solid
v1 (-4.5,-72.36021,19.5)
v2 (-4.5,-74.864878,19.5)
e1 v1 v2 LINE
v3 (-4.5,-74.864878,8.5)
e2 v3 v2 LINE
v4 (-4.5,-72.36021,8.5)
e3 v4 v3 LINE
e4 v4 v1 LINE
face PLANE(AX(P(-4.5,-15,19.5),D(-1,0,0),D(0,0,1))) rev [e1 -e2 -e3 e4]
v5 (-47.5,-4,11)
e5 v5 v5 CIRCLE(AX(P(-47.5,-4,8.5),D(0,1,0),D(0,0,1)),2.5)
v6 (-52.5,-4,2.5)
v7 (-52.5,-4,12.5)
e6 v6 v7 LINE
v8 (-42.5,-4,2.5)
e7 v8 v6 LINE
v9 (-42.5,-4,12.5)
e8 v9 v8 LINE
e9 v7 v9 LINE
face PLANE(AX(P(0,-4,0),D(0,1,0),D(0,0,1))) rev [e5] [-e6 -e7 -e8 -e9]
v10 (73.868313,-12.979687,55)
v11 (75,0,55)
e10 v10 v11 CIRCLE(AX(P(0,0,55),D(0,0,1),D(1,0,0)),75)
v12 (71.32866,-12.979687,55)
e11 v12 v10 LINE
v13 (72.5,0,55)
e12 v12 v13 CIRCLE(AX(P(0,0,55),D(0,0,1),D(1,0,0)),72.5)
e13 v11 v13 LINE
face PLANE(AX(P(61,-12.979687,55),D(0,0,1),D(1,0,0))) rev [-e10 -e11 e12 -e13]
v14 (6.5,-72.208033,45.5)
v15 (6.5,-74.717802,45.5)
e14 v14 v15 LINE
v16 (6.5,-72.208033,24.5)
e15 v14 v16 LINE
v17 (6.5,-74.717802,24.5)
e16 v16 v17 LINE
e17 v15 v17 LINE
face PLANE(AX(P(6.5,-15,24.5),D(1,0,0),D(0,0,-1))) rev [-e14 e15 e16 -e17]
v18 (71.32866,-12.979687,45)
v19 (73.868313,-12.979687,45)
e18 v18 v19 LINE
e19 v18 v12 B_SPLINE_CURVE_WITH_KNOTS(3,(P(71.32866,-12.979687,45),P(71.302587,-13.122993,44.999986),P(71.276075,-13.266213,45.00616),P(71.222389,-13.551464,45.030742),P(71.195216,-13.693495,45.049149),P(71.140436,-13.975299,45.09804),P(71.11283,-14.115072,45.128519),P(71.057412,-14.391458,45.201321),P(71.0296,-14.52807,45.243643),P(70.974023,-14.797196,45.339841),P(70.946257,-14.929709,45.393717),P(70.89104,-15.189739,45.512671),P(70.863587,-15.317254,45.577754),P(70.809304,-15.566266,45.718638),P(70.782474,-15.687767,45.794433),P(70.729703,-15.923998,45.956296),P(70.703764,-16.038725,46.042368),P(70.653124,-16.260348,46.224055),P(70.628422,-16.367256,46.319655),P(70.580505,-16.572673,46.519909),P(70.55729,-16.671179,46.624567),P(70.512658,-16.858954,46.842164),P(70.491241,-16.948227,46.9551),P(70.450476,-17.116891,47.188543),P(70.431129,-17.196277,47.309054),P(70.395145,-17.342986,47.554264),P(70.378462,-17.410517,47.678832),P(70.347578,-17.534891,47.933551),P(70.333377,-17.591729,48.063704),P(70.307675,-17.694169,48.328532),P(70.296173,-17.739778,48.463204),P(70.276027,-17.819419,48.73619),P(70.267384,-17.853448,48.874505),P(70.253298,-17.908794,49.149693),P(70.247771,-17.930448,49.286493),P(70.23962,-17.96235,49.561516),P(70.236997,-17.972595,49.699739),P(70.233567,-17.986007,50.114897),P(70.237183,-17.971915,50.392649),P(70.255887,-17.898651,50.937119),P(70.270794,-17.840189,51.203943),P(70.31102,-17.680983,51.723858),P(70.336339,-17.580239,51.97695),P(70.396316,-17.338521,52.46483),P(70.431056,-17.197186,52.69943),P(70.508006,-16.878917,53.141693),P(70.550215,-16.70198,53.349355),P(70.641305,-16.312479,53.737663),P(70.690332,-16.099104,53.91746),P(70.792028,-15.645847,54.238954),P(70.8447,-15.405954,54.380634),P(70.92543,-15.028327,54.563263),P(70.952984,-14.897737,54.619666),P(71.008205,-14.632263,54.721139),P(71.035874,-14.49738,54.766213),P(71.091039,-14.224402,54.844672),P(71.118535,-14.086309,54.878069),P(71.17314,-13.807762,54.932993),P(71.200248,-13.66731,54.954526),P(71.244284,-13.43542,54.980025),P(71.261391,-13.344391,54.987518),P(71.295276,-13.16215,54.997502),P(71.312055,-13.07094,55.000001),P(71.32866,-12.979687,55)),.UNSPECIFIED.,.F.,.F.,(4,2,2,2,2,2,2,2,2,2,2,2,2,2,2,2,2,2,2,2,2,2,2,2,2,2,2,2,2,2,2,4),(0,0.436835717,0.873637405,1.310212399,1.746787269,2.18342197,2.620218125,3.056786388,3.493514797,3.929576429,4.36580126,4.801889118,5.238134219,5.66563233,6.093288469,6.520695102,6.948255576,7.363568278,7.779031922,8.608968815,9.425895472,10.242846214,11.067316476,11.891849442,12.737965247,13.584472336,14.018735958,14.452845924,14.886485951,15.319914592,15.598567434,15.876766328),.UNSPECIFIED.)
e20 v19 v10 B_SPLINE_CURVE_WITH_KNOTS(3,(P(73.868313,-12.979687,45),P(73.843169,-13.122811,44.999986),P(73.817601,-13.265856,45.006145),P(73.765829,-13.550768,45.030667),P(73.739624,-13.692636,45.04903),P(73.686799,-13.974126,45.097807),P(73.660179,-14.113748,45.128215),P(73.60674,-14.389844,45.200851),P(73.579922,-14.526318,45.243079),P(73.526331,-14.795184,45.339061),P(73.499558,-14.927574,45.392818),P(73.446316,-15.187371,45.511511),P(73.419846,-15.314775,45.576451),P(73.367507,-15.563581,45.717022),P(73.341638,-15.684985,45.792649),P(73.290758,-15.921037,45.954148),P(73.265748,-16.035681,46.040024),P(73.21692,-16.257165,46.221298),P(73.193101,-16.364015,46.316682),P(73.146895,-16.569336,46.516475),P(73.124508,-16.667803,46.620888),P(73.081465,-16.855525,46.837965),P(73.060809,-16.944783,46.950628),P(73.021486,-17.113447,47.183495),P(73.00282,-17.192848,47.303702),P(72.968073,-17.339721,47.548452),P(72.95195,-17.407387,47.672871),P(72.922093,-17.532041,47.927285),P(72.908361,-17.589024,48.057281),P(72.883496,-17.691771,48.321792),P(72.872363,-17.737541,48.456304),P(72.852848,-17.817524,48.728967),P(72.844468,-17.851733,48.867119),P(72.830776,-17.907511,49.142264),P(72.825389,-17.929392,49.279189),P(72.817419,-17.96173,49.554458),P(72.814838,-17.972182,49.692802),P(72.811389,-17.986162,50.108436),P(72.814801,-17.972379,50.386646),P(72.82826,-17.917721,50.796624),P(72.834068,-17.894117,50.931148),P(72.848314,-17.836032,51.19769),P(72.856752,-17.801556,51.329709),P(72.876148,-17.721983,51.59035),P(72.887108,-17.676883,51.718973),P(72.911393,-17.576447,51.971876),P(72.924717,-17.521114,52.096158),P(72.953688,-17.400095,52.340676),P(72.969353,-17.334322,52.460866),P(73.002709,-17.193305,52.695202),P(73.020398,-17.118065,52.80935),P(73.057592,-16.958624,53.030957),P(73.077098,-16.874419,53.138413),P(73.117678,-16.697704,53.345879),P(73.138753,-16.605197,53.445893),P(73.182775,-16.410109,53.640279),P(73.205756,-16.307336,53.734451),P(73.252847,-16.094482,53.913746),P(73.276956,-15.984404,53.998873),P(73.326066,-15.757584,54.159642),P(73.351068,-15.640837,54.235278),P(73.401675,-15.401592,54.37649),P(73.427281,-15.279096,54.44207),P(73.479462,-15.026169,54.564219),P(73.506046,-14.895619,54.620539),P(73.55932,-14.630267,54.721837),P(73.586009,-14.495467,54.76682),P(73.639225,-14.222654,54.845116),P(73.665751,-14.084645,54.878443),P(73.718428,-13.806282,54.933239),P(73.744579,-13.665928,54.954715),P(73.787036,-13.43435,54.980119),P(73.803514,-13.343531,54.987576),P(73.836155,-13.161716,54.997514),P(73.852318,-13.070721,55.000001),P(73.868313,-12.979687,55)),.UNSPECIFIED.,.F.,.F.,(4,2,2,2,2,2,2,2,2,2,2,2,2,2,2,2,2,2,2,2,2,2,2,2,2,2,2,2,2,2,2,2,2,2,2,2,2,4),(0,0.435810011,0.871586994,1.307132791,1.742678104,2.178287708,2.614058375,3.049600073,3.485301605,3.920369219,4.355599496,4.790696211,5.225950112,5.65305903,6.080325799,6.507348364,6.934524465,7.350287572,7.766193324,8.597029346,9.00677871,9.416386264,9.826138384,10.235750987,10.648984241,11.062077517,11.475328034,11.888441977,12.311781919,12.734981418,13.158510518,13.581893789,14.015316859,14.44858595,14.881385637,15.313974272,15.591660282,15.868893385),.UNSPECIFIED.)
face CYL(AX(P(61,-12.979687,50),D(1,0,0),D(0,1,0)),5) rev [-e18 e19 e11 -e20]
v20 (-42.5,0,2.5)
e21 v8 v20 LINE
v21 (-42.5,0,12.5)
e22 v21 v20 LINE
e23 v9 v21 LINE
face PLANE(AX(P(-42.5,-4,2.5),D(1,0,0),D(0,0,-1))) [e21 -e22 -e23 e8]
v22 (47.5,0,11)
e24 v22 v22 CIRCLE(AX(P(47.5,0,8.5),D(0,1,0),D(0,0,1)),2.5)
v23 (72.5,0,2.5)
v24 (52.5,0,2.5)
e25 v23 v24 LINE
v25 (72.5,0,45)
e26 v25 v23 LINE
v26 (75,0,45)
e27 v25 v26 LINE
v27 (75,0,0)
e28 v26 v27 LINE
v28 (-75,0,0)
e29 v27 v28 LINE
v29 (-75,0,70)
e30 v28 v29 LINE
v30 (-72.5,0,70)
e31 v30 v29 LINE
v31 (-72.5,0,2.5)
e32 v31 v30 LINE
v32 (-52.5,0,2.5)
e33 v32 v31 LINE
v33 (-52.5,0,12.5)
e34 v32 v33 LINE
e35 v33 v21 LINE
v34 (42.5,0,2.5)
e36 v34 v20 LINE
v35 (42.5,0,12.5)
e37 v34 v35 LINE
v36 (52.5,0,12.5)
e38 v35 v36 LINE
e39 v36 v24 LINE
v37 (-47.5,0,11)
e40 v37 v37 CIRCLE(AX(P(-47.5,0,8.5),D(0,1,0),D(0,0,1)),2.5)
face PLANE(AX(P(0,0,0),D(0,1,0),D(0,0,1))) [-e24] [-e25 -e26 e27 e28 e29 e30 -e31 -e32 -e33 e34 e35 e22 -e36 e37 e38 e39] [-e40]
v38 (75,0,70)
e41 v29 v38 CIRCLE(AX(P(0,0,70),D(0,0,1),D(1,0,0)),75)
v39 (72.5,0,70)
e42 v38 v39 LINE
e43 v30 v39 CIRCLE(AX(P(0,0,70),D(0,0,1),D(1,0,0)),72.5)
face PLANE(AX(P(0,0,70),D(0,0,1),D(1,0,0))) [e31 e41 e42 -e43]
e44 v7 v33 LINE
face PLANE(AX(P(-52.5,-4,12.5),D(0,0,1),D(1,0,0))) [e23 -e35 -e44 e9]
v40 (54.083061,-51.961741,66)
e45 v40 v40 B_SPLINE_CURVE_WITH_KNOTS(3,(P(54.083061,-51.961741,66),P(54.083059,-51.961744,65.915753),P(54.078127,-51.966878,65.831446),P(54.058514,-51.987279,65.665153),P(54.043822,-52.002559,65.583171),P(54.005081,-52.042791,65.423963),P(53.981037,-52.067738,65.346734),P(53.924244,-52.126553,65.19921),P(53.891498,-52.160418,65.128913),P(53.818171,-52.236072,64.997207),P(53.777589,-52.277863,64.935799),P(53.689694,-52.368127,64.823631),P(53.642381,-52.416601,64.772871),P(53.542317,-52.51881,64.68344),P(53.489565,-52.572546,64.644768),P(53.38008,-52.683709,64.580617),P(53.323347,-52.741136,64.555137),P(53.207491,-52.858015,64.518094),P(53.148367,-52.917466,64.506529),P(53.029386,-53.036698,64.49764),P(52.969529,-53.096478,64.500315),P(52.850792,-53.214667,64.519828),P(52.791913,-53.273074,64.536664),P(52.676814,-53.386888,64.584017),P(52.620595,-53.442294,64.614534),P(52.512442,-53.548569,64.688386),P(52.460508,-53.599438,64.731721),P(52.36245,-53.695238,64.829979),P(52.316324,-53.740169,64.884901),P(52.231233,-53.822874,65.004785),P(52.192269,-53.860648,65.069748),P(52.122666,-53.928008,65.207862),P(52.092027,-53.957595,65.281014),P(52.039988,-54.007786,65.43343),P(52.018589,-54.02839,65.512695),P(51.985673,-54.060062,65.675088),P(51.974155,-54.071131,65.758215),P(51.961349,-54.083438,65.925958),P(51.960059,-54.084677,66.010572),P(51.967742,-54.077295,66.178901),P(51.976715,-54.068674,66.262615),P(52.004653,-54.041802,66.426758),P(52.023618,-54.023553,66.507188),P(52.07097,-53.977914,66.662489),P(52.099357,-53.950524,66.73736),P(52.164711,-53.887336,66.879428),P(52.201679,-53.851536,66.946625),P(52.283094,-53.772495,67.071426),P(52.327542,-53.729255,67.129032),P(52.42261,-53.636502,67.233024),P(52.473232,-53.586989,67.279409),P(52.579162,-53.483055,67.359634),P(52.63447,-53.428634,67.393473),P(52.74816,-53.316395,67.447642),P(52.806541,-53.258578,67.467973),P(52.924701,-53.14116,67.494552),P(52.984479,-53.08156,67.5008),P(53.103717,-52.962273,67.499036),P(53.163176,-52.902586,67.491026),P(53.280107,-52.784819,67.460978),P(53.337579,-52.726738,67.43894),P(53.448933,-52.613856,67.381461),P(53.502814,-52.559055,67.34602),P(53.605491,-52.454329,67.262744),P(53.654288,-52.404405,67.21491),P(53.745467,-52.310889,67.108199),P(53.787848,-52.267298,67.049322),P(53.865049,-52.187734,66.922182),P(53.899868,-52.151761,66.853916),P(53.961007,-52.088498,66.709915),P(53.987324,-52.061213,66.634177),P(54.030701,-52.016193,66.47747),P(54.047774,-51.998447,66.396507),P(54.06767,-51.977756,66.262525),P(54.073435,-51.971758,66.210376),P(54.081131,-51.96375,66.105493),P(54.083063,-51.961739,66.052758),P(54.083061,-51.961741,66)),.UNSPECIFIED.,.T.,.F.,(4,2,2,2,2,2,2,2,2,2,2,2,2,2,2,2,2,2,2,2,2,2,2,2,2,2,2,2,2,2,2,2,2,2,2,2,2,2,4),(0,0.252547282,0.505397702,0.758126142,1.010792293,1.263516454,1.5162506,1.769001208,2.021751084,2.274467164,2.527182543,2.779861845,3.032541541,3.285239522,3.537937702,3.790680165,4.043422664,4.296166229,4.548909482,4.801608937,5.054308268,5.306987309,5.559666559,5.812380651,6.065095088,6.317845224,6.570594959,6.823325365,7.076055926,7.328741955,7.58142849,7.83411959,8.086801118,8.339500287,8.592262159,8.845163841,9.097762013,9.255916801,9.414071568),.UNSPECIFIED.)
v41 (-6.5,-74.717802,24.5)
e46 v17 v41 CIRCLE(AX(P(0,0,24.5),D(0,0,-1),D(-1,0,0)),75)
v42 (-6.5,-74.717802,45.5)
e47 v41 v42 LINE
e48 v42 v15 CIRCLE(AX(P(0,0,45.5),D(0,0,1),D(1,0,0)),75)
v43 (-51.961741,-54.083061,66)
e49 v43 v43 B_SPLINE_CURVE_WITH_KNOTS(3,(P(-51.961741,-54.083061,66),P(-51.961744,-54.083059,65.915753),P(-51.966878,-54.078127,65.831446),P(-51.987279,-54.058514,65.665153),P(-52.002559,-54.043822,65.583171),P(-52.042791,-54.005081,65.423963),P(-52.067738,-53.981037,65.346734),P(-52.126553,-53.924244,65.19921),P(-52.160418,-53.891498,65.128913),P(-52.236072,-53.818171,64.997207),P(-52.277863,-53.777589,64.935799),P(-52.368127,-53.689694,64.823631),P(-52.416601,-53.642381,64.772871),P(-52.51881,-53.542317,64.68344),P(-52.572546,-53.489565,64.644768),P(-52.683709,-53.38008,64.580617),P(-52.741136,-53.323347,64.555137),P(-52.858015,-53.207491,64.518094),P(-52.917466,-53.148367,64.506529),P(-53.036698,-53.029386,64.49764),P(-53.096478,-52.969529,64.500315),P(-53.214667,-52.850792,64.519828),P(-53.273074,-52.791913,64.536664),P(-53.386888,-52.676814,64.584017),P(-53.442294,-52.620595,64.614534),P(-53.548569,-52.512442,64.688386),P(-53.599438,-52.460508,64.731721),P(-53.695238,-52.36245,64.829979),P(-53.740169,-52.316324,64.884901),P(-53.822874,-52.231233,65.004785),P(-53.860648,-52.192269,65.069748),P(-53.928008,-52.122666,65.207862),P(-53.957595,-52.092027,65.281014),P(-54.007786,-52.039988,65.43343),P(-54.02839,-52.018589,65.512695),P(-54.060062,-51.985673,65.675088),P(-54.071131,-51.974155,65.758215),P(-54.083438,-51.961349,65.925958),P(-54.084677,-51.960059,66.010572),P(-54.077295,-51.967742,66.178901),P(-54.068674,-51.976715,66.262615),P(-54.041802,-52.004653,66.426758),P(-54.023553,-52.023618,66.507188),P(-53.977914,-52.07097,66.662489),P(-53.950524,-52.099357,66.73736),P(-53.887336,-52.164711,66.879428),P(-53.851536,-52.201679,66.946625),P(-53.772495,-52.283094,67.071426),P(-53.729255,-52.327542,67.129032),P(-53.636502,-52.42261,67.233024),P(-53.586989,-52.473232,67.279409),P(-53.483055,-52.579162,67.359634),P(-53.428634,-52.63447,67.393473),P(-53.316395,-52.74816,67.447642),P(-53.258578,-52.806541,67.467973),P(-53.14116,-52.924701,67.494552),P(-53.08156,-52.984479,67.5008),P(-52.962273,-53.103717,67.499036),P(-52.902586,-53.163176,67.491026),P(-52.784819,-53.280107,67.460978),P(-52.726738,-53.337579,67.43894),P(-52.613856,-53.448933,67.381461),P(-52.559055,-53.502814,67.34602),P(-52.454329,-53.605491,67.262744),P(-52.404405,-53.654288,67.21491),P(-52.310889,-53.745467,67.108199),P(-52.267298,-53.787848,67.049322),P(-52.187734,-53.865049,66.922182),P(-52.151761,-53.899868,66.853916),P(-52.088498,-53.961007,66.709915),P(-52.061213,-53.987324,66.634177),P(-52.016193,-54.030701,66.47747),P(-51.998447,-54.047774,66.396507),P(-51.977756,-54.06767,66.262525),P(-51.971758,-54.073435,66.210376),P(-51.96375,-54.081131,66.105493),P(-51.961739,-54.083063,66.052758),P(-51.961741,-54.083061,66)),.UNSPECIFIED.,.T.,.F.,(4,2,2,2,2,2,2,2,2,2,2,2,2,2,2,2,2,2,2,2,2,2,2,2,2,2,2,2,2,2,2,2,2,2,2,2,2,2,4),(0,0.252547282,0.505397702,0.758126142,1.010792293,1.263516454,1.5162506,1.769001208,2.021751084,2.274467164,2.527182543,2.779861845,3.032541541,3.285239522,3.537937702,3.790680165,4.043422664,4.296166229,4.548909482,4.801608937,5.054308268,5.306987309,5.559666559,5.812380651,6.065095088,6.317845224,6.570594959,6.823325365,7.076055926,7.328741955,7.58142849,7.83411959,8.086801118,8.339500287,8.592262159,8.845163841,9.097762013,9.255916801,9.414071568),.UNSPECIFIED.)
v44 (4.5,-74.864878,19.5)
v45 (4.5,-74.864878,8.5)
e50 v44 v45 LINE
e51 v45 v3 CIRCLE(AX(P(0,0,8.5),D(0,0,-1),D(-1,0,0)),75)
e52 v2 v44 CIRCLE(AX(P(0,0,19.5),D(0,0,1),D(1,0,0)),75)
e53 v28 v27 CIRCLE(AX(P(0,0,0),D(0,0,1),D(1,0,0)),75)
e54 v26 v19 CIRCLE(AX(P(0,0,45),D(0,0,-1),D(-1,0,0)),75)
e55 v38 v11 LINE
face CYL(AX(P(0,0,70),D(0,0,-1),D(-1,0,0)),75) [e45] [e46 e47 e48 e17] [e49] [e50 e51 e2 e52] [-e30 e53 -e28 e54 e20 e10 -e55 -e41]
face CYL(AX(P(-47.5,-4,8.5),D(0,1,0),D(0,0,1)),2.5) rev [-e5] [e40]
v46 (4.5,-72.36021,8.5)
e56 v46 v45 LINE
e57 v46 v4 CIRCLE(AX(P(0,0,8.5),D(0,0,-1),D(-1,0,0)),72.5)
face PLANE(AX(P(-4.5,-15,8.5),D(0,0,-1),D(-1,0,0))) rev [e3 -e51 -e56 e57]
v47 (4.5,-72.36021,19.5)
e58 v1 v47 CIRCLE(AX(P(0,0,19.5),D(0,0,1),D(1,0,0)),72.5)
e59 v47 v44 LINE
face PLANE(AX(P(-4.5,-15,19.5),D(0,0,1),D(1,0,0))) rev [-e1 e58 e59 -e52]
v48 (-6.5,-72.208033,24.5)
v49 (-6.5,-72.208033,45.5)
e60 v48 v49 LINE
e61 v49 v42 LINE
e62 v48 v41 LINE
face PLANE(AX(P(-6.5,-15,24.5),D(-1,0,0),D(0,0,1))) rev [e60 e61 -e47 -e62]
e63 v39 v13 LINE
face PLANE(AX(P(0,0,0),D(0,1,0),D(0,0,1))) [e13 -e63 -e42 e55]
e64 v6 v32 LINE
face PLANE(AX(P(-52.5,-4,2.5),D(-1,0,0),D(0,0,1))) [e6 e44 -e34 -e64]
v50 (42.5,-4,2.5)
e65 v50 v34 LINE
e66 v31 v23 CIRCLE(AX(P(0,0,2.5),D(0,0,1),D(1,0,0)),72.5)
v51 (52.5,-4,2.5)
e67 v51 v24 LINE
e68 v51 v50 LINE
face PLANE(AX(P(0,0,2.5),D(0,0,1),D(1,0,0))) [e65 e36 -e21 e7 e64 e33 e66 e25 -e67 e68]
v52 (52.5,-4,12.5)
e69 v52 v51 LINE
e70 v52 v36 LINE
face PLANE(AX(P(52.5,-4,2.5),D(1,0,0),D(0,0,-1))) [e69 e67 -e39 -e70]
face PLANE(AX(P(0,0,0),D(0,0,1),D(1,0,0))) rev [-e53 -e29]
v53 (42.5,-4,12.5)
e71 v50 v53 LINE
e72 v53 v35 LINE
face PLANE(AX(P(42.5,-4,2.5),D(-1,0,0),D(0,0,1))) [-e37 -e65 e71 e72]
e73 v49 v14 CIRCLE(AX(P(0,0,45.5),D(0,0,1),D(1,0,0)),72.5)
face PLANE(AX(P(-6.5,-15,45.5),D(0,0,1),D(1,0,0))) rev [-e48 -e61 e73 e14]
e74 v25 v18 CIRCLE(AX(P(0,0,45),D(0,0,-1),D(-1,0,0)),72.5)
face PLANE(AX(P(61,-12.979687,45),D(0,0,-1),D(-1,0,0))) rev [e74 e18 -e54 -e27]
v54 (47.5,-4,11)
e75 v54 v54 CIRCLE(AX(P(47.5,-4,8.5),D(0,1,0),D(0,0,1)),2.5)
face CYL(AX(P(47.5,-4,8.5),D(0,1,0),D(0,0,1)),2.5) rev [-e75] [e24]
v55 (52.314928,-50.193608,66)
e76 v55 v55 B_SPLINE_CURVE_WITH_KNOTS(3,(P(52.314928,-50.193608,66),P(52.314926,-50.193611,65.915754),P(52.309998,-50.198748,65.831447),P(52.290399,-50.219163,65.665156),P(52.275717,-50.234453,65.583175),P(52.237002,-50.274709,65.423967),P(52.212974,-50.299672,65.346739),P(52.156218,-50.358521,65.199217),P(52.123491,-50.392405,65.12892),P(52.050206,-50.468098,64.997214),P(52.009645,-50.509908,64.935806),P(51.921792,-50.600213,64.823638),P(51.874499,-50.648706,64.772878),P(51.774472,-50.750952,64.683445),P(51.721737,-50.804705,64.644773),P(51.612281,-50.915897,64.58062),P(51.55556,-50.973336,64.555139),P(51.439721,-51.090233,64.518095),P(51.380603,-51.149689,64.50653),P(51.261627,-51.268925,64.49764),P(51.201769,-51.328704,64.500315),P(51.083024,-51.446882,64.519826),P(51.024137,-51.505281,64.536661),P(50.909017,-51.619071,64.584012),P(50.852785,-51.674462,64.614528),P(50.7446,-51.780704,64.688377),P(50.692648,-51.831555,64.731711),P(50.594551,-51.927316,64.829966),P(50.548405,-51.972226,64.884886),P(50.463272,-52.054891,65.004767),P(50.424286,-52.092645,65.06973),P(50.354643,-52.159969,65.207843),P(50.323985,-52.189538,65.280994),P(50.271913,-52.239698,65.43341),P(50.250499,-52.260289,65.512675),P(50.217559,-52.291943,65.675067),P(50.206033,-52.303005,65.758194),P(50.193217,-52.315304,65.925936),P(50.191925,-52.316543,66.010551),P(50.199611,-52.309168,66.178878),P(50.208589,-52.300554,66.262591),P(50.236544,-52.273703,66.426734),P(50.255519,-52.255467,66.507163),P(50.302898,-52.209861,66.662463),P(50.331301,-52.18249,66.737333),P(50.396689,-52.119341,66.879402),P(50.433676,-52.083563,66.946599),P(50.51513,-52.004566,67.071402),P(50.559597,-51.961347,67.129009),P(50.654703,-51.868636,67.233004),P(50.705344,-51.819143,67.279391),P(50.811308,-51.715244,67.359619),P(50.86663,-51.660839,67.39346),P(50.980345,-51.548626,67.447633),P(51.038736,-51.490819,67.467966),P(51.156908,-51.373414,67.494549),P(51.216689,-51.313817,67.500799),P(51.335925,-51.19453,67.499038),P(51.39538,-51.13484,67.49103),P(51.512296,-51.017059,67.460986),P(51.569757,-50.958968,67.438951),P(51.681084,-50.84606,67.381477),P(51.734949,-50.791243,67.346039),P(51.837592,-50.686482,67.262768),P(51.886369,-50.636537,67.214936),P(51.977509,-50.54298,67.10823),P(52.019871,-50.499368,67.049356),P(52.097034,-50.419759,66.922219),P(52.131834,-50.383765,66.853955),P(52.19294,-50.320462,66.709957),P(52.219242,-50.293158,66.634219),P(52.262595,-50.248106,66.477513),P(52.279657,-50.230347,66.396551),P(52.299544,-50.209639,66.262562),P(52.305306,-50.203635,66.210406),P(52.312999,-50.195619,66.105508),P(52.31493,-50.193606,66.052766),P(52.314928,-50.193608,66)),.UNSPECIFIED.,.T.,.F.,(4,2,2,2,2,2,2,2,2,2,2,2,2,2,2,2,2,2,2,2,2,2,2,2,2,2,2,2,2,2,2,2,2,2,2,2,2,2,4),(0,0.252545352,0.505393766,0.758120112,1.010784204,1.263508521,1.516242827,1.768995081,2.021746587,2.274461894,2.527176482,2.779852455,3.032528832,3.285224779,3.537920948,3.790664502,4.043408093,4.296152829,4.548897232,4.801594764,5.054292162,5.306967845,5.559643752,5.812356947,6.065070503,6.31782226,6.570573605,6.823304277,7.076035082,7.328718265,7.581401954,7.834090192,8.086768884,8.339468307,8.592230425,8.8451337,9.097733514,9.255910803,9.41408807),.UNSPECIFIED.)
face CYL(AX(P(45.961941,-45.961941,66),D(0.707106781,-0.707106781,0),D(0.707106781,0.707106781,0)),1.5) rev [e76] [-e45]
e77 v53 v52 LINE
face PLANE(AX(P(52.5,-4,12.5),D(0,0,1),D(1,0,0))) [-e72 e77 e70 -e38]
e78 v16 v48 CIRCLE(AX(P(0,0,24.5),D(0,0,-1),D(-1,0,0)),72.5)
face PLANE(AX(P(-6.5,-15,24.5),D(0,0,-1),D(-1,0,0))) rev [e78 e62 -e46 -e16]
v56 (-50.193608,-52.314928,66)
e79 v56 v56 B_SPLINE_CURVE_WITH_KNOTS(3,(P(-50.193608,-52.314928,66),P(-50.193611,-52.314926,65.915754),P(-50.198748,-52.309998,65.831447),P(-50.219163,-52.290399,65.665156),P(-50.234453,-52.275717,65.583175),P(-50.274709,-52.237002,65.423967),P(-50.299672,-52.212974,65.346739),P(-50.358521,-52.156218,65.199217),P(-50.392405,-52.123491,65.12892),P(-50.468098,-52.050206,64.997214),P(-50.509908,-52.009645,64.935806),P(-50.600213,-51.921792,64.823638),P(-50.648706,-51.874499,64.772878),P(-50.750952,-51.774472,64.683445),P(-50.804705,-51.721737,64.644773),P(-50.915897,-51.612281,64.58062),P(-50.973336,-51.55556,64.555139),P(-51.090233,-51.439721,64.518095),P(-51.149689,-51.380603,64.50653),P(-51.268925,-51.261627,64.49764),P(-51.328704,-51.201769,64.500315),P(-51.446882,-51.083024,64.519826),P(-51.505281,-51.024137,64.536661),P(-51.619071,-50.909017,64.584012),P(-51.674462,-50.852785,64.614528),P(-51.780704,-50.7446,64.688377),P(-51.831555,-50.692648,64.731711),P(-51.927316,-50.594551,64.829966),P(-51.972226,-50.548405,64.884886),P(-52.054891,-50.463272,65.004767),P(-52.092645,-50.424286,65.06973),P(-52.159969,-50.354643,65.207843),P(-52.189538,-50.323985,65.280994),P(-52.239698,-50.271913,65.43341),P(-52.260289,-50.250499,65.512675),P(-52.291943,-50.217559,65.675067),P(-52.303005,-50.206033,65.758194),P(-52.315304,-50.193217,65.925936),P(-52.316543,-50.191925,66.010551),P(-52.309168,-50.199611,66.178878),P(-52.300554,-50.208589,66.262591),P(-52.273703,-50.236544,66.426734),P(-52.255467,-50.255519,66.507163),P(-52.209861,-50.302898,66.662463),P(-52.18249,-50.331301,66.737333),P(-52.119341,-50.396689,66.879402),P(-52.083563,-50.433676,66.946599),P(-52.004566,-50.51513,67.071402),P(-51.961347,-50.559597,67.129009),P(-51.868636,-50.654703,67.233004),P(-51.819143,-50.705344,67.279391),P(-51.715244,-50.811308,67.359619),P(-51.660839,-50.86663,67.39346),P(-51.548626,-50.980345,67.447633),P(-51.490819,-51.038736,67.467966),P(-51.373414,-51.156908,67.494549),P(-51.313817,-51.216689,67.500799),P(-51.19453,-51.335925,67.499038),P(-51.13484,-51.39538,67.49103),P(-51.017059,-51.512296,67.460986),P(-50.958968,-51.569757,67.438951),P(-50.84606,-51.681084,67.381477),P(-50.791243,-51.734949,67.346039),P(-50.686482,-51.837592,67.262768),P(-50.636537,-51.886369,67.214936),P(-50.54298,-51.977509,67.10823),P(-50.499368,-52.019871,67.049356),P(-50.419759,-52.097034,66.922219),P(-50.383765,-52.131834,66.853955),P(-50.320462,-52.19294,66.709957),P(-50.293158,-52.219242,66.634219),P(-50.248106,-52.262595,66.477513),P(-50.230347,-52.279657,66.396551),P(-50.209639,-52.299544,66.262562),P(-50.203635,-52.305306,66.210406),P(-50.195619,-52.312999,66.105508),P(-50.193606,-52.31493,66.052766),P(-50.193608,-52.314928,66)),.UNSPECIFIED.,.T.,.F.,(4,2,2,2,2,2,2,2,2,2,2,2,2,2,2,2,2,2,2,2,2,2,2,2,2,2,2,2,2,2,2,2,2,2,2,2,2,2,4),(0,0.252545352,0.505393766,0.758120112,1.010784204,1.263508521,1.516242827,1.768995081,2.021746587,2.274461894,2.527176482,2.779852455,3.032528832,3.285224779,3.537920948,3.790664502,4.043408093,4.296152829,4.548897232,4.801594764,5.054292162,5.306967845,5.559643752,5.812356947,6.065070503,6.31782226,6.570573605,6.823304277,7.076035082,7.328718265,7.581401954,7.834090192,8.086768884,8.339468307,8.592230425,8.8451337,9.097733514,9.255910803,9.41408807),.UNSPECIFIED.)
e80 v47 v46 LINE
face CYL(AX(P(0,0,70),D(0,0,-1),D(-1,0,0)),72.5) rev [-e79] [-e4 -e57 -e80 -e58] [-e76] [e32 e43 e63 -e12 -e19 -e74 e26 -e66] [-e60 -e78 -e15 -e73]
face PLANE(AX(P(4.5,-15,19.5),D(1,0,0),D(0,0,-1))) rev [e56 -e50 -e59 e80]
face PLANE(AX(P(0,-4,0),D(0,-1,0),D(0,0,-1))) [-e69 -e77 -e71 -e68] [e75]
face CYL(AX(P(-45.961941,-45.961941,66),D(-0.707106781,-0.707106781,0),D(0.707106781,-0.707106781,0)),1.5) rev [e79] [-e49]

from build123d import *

# Parameters (mm, degrees)
SZKIC1_R                         = 75
DODANIE_WYCI_GNI_CIE1_DEPTH      = 70
SKORUPA1_T                       = -2.5
SZKIC3_W                         = 13
SZKIC3_H                         = 21
WYTNIJ_WYCI_GNI_CIE1_DEPTH       = 60
SZKIC4_W                         = 9
SZKIC4_H                         = 11
WYTNIJ_WYCI_GNI_CIE2_DEPTH       = 60
DODANIE_WYCI_GNI_CIE2_REACH      = 192.066
DODANIE_WYCI_GNI_CIE2_END_RADIUS = 75
SZKIC7_W                         = 60
SZKIC7_H                         = 35
SZKIC8_W                         = 45.5
SZKIC8_H                         = 26.5
WYTNIJ_WYCI_GNI_CIE4_DEPTH       = 30
ZAOKR_GLENIE1_R                  = 5
WYTNIJ_WYCI_GNI_CIE5_DEPTH       = 14
SZKIC10_R                        = 1.5
WYTNIJ_WYCI_GNI_CIE6_DEPTH       = 10
SZYK_KO_OWY1_COUNT               = 4
PRZECI_CIE2_OUTLINE_W            = 152
PRZECI_CIE2_OUTLINE_H            = 70
PRZECI_CIE2_OUTLINE_W_2          = 45.5
PRZECI_CIE2_OUTLINE_H_2          = 26.5
PRZECI_CIE2_DEPTH                = 85
SZKIC11_W                        = 10
SZKIC11_H                        = 10
SZKIC11_R                        = 2.5
DODANIE_WYCI_GNI_CIE3_DEPTH      = 4


# Read off the part's stored shape, not the designer's step: Przecięcie2
with BuildPart() as part:
    # Szkic1 → Dodanie-wyciągnięcie1 (new body)
    with BuildSketch(Plane.XY):
        Circle(SZKIC1_R)
    extrude(amount=DODANIE_WYCI_GNI_CIE1_DEPTH)

    # Skorupa1
    skorupa1_openings = [part.faces().sort_by_distance(p)[0] for p in [
        (0, 0, 70),
    ]]
    offset(amount=SKORUPA1_T, openings=skorupa1_openings, kind=Kind.INTERSECTION)

    # Szkic3 → Wytnij-wyciągnięcie1 (cut)
    with BuildSketch(Plane(origin=(0, -75, 0), x_dir=(-1, 0, 0), z_dir=(0, -1, 0))):
        with Locations((0, -35)):
            Rectangle(SZKIC3_W, SZKIC3_H)
    extrude(amount=-WYTNIJ_WYCI_GNI_CIE1_DEPTH, mode=Mode.SUBTRACT)

    # Szkic4 → Wytnij-wyciągnięcie2 (cut)
    with BuildSketch(Plane(origin=(0, -75, 0), x_dir=(-1, 0, 0), z_dir=(0, -1, 0))):
        with Locations((0, -14)):
            Rectangle(SZKIC4_W, SZKIC4_H)
    extrude(amount=-WYTNIJ_WYCI_GNI_CIE2_DEPTH, mode=Mode.SUBTRACT)

    # Dodanie-wyciągnięcie2: up to this cylinder (the profile starts outside it)
    dodanie_wyci_gni_cie2_end = Plane(origin=(0, 0, 35.532003), z_dir=(0, 0, -1)) * Cylinder(DODANIE_WYCI_GNI_CIE2_END_RADIUS, 535.132, mode=Mode.PRIVATE)
    # Szkic7 → Dodanie-wyciągnięcie2 (add, up to the surface)
    with BuildSketch(Plane(origin=(0, 85, 0), x_dir=(-1, 0, 0), z_dir=(0, -1, 0)), mode=Mode.PRIVATE) as dodanie_wyci_gni_cie2_sk1:
        with Locations((0, -35.532003496)):
            Rectangle(SZKIC7_W, SZKIC7_H)
    dodanie_wyci_gni_cie2_tool1 = extrude(dodanie_wyci_gni_cie2_sk1.sketch, amount=DODANIE_WYCI_GNI_CIE2_REACH, mode=Mode.PRIVATE) - dodanie_wyci_gni_cie2_end
    add(dodanie_wyci_gni_cie2_tool1.solids().sort_by_distance((0, 85, 35.532003))[0])

    # Szkic8 → Wytnij-wyciągnięcie4 (cut)
    with BuildSketch(Plane(origin=(0, 85, 0), x_dir=(1, 0, 0), z_dir=(0, 1, 0))):
        with Locations((0, -35.532003496)):
            Rectangle(SZKIC8_W, SZKIC8_H)
    extrude(amount=-WYTNIJ_WYCI_GNI_CIE4_DEPTH, mode=Mode.SUBTRACT)

    # Zaokrąglenie1
    zaokr_glenie1_edges = [part.edges().sort_by_distance(p)[0] for p in [
        (-30, 76.869317712, 18.032003496),
        (-30, 76.869317712, 53.032003496),
        (30, 76.869317712, 18.032003496),
        (30, 76.869317712, 53.032003496),
    ]]
    fillet(zaokr_glenie1_edges, radius=ZAOKR_GLENIE1_R)

    # Szkic9 → Wytnij-wyciągnięcie5 (cut)
    with BuildSketch(Plane(origin=(75, 0, 0), x_dir=(0, 0, -1), z_dir=(1, 0, 0))):
        with BuildLine():
            Line((-55, -12.979686846), (-55, 12.020313154))
            ThreePointArc((-55, 12.020313154), (-50, 17.020313154), (-45, 12.020313154))
            Line((-45, 12.020313154), (-45, -12.979686846))
            ThreePointArc((-45, -12.979686846), (-50, -17.979686846), (-55, -12.979686846))
        make_face()
    extrude(amount=-WYTNIJ_WYCI_GNI_CIE5_DEPTH, mode=Mode.SUBTRACT)

    # Szkic10 → Wytnij-wyciągnięcie6 (cut)
    with BuildSketch(Plane(origin=(53.033008589, 53.033008589, 0), x_dir=(0, 0, -1), z_dir=(0.7071067811865512, 0.7071067811865438, 0))):
        with Locations(Location((-66, 0, 0), (0, 0, 90))):
            Circle(SZKIC10_R)
    wytnij_wyci_gni_cie6 = extrude(amount=-WYTNIJ_WYCI_GNI_CIE6_DEPTH, mode=Mode.SUBTRACT)

    # Szyk kołowy1: Wytnij-wyciągnięcie6 ×4 about axis
    szyk_ko_owy1_axis = Axis((0, 0, 70), (0, 0, -1))
    for i in range(1, SZYK_KO_OWY1_COUNT):
        add(wytnij_wyci_gni_cie6.rotate(szyk_ko_owy1_axis, i * 360 / SZYK_KO_OWY1_COUNT), mode=Mode.SUBTRACT)

    # Przecięcie2 outline → Przecięcie2 (cut)
    with BuildSketch(Plane(origin=(0, 0, 0), x_dir=(1, 0, 0), z_dir=(0, 1, 0))):
        with Locations((0, -35)):
            Rectangle(PRZECI_CIE2_OUTLINE_W, PRZECI_CIE2_OUTLINE_H)
        with Locations((0, -35.532003496)):
            Rectangle(PRZECI_CIE2_OUTLINE_W_2, PRZECI_CIE2_OUTLINE_H_2, mode=Mode.SUBTRACT)
    extrude(amount=PRZECI_CIE2_DEPTH, mode=Mode.SUBTRACT)

    # Szkic11 → Dodanie-wyciągnięcie3 (add)
    # profile 1 of 2: a face of its own
    with BuildSketch(Plane(origin=(0, 0, 0), x_dir=(1, 0, 0), z_dir=(0, 1, 0))):
        with Locations((47.5, -7.5)):
            Rectangle(SZKIC11_W, SZKIC11_H)
        with Locations(Location((47.5, -8.5, 0), (0, 0, 270))):
            Circle(SZKIC11_R, mode=Mode.SUBTRACT)
    # profile 2 of 2: a face of its own
    with BuildSketch(Plane(origin=(0, 0, 0), x_dir=(1, 0, 0), z_dir=(0, 1, 0))):
        with Locations((-47.5, -7.5)):
            Rectangle(SZKIC11_W, SZKIC11_H)
        with Locations(Location((-47.5, -8.5, 0), (0, 0, 270))):
            Circle(SZKIC11_R, mode=Mode.SUBTRACT)
    extrude(amount=-DODANIE_WYCI_GNI_CIE3_DEPTH)


solid = part.part
